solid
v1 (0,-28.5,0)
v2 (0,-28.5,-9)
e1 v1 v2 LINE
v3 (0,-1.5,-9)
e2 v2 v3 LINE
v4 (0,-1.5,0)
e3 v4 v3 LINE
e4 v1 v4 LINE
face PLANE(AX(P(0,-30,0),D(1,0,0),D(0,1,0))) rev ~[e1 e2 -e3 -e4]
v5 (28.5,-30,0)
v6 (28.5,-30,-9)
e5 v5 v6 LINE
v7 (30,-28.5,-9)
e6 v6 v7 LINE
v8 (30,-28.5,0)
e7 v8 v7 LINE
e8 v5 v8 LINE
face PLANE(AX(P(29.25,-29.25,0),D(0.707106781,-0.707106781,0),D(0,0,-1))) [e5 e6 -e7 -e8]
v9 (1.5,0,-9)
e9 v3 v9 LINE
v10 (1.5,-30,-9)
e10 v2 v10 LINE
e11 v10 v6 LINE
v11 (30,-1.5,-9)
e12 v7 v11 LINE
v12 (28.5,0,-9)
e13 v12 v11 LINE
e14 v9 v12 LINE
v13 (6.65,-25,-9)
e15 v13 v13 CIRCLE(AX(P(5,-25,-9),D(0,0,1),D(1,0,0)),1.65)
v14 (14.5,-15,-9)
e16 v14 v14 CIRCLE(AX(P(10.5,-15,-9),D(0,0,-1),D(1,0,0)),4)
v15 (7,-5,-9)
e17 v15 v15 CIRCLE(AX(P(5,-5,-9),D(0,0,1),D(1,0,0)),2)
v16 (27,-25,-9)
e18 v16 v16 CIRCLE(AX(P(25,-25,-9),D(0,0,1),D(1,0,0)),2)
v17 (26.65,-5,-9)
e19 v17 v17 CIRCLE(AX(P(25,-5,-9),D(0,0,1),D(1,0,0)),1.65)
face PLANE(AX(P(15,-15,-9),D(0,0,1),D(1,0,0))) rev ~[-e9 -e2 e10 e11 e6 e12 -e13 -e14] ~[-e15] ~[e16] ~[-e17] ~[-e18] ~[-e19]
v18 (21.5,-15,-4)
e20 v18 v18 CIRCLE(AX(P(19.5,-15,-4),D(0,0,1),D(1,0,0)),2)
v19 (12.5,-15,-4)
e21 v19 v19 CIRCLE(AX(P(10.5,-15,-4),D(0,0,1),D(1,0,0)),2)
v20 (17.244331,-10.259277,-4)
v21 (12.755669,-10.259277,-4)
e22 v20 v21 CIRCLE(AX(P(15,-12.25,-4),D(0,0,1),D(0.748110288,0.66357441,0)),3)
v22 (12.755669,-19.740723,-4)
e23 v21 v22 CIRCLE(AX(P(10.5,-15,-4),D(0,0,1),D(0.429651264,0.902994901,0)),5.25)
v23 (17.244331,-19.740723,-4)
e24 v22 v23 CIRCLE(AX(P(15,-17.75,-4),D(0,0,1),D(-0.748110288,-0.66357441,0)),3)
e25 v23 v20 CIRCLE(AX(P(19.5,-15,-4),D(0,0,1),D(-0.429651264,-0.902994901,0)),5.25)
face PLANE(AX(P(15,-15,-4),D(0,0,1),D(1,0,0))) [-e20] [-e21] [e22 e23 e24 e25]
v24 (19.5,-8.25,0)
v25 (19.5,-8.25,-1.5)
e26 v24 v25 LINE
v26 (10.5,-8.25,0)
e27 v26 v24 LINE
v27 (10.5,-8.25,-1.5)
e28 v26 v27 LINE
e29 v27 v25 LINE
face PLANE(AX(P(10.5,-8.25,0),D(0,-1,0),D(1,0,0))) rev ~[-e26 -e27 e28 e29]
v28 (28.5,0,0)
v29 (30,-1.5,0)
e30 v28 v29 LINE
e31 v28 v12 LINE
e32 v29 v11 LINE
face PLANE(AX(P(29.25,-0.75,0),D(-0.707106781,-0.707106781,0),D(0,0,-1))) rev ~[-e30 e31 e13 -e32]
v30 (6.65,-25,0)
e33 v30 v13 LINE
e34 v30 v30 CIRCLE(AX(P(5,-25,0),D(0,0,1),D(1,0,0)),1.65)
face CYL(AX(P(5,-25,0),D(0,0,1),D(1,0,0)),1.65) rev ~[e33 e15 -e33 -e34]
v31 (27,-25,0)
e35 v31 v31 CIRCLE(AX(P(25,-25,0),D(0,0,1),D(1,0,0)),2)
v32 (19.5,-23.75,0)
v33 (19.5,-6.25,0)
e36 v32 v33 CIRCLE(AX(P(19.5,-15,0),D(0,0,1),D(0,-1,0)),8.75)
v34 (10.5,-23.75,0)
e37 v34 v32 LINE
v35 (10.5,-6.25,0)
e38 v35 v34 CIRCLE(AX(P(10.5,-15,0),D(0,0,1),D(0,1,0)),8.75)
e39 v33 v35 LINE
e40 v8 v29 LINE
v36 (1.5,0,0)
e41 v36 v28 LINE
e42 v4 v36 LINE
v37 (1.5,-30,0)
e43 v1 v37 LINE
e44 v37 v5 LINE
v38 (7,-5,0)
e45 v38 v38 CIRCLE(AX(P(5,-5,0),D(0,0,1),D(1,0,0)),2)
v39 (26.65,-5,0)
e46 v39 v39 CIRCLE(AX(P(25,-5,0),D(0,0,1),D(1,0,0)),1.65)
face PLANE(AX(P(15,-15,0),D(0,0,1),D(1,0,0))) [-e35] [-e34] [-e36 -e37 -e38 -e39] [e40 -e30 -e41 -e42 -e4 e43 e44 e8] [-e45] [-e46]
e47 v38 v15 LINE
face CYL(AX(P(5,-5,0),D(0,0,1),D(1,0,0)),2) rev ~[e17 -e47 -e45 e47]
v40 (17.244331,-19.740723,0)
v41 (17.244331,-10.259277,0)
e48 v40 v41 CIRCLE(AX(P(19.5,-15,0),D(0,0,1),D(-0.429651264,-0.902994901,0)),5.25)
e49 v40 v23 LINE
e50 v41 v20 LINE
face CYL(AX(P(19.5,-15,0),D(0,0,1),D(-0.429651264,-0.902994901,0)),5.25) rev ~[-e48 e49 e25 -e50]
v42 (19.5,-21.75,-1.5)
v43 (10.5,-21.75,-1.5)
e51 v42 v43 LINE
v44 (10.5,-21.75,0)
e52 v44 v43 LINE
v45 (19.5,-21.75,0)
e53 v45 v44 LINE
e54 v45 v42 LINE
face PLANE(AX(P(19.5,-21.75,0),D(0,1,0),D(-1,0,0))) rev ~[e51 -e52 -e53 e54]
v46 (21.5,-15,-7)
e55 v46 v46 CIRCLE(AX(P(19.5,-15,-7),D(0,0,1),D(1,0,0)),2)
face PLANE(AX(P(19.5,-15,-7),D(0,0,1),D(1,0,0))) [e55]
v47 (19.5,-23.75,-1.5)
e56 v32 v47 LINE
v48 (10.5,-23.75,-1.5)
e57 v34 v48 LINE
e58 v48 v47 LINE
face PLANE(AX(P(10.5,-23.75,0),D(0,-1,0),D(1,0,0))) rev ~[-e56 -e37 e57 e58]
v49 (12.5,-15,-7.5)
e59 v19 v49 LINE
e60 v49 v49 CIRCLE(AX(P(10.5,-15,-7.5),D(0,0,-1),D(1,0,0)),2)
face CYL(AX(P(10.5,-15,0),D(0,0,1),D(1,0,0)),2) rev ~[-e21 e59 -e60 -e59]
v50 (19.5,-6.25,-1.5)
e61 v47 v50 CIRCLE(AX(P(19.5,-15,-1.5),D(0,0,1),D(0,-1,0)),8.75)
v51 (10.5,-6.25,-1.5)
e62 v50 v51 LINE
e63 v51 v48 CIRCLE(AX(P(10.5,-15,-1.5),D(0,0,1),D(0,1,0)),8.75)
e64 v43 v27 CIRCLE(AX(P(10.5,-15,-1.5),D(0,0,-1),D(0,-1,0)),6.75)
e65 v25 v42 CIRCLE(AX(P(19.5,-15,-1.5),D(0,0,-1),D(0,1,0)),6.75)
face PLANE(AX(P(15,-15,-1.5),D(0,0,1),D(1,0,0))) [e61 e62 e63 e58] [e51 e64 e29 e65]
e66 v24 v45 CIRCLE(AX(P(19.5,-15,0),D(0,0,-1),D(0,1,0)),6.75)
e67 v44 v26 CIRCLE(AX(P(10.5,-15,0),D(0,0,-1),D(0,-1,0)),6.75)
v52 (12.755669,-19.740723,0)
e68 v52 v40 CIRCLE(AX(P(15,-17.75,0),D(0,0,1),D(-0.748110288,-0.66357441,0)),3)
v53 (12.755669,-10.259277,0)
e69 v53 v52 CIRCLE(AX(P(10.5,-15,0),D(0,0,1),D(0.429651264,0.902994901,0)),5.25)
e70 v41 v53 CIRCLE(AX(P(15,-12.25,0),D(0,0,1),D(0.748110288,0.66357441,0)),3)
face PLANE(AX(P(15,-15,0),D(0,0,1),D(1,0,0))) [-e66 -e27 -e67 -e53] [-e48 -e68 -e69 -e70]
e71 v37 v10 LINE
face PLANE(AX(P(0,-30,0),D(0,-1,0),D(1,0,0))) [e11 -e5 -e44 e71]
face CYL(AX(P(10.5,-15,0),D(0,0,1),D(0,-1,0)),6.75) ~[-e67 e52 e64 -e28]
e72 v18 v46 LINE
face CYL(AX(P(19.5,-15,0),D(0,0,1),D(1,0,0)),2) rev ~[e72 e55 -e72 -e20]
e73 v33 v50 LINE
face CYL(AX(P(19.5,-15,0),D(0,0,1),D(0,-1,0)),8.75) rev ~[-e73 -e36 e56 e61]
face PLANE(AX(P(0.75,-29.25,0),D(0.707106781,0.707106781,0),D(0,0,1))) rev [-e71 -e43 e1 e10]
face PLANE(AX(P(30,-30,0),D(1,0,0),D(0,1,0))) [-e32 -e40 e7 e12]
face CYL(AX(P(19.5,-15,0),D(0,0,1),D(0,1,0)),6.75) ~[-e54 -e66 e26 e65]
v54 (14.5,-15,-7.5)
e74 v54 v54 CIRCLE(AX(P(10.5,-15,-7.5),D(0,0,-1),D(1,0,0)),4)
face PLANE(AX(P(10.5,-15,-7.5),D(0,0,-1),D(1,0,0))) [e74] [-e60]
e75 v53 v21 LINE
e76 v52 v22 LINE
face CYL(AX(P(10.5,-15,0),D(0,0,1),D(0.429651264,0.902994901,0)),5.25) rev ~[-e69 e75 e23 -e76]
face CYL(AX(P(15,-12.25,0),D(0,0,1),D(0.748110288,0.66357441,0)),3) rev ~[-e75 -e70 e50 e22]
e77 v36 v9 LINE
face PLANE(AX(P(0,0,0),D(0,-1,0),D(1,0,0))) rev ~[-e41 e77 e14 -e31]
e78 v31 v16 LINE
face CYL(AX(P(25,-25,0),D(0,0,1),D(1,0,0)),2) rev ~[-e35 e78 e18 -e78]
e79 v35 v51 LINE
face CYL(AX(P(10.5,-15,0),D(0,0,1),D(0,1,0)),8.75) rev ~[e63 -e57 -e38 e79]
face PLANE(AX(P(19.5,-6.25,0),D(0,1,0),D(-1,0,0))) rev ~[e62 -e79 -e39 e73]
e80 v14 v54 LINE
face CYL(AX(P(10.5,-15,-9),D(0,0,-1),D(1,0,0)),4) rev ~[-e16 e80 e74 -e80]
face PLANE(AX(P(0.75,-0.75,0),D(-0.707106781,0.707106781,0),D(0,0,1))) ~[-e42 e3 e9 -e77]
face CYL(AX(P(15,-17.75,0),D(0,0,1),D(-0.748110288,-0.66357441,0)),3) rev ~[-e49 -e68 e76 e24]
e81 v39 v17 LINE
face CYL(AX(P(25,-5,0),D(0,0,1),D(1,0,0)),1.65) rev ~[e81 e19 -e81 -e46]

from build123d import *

# Parameters (mm, degrees)
F0_W     = 30
F0_H     = 30
F0_R     = 1.65
F0_R_2   = 2
F1_DEPTH = 9
F2_DEPTH = 1.5
F3_DEPTH = 7
F4_DEPTH = 4
F5_R     = 4
F5_R_2   = 2
F6_DEPTH = 1.5
F7_DEPTH = 10
F8_SIZE  = 1.5


# Not quite as in the source:
# - a feature names something its author has since deleted; it is built from what else it names


with BuildPart() as f1:
    # F0 (on Top) → F1 (new body)
    with BuildSketch(Plane.XY):
        with Locations((15, -15)):
            Rectangle(F0_W, F0_H)
        with Locations((5, -25)):
            Circle(F0_R, mode=Mode.SUBTRACT)
        with Locations((25, -25)):
            Circle(F0_R_2, mode=Mode.SUBTRACT)
        with Locations((5, -5)):
            Circle(F0_R_2, mode=Mode.SUBTRACT)
        with BuildLine():
            Line((19.5, -23.75), (10.5, -23.75))
            ThreePointArc((10.5, -23.75), (1.75, -15), (10.5, -6.25))
            Line((10.5, -6.25), (19.5, -6.25))
            ThreePointArc((19.5, -6.25), (28.25, -15), (19.5, -23.75))
        make_face(mode=Mode.SUBTRACT)
        with Locations((25, -5)):
            Circle(F0_R, mode=Mode.SUBTRACT)
        with BuildLine():
            ThreePointArc((10.5, -6.25), (1.75, -15), (10.5, -23.75))
            Line((10.5, -23.75), (19.5, -23.75))
            ThreePointArc((19.5, -23.75), (28.25, -15), (19.5, -6.25))
            Line((19.5, -6.25), (10.5, -6.25))
        make_face()
        with BuildLine():
            ThreePointArc((10.5, -21.75), (3.75, -15), (10.5, -8.25))
            Line((10.5, -8.25), (19.5, -8.25))
            ThreePointArc((19.5, -8.25), (26.25, -15), (19.5, -21.75))
            Line((19.5, -21.75), (10.5, -21.75))
        make_face(mode=Mode.SUBTRACT)
        with BuildLine():
            Line((19.5, -8.25), (10.5, -8.25))
            ThreePointArc((10.5, -8.25), (3.75, -15), (10.5, -21.75))
            Line((10.5, -21.75), (19.5, -21.75))
            ThreePointArc((19.5, -21.75), (26.25, -15), (19.5, -8.25))
        make_face()
        with BuildLine():
            ThreePointArc((17.2443308628, -10.25927677), (24.75, -15), (17.2443308628, -19.74072323))
            ThreePointArc((17.2443308628, -19.74072323), (15, -20.75), (12.7556691372, -19.74072323))
            ThreePointArc((12.7556691372, -19.74072323), (5.25, -15), (12.7556691372, -10.25927677))
            ThreePointArc((12.7556691372, -10.25927677), (15, -9.25), (17.2443308628, -10.25927677))
        make_face(mode=Mode.SUBTRACT)
        with BuildLine():
            ThreePointArc((12.7556691372, -19.74072323), (15, -20.75), (17.2443308628, -19.74072323))
            ThreePointArc((17.2443308628, -19.74072323), (24.75, -15), (17.2443308628, -10.25927677))
            ThreePointArc((17.2443308628, -10.25927677), (15, -9.25), (12.7556691372, -10.25927677))
            ThreePointArc((12.7556691372, -10.25927677), (5.25, -15), (12.7556691372, -19.74072323))
        make_face()
        with Locations((10.5, -15)):
            Circle(F0_R_2, mode=Mode.SUBTRACT)
        with Locations((19.5, -15)):
            Circle(F0_R_2, mode=Mode.SUBTRACT)
        with Locations((19.5, -15)):
            Circle(F0_R_2)
        with Locations((25, -25)):
            Circle(F0_R_2)
        with Locations((25, -5)):
            Circle(F0_R)
    extrude(amount=-F1_DEPTH)

    # F0 (on Top) → F2 (cut)
    with BuildSketch(Plane.XY):
        with BuildLine():
            ThreePointArc((10.5, -6.25), (1.75, -15), (10.5, -23.75))
            Line((10.5, -23.75), (19.5, -23.75))
            ThreePointArc((19.5, -23.75), (28.25, -15), (19.5, -6.25))
            Line((19.5, -6.25), (10.5, -6.25))
        make_face()
        with BuildLine():
            ThreePointArc((10.5, -21.75), (3.75, -15), (10.5, -8.25))
            Line((10.5, -8.25), (19.5, -8.25))
            ThreePointArc((19.5, -8.25), (26.25, -15), (19.5, -21.75))
            Line((19.5, -21.75), (10.5, -21.75))
        make_face(mode=Mode.SUBTRACT)
    extrude(amount=-F2_DEPTH, mode=Mode.SUBTRACT)

    # F0 (on Top) → F3 (cut)
    with BuildSketch(Plane.XY):
        with Locations((19.5, -15)):
            Circle(F0_R_2)
    extrude(amount=-F3_DEPTH, mode=Mode.SUBTRACT)

    # F0 (on Top) → F4 (cut)
    with BuildSketch(Plane.XY):
        with BuildLine():
            ThreePointArc((12.7556691372, -19.74072323), (15, -20.75), (17.2443308628, -19.74072323))
            ThreePointArc((17.2443308628, -19.74072323), (24.75, -15), (17.2443308628, -10.25927677))
            ThreePointArc((17.2443308628, -10.25927677), (15, -9.25), (12.7556691372, -10.25927677))
            ThreePointArc((12.7556691372, -10.25927677), (5.25, -15), (12.7556691372, -19.74072323))
        make_face()
        with Locations((10.5, -15)):
            Circle(F0_R_2, mode=Mode.SUBTRACT)
        with Locations((19.5, -15)):
            Circle(F0_R_2, mode=Mode.SUBTRACT)
    extrude(amount=-F4_DEPTH, mode=Mode.SUBTRACT)

    # F5 (on face) → F6 (cut)
    with BuildSketch(Plane(origin=(0, 0, -9), x_dir=(1, 0, 0), z_dir=(0, 0, -1))):
        with Locations((10.5, 15)):
            Circle(F5_R)
        with Locations((10.5, 15)):
            Circle(F5_R_2, mode=Mode.SUBTRACT)
    extrude(amount=-F6_DEPTH, mode=Mode.SUBTRACT)

    # F0 (on Top) → F7 (cut)
    with BuildSketch(Plane.XY):
        with Locations((25, -25)):
            Circle(F0_R_2)
        with Locations((25, -5)):
            Circle(F0_R)
    extrude(amount=-F7_DEPTH, mode=Mode.SUBTRACT)

    # F8
    f8_edges = [f1.edges().sort_by_distance(p)[0] for p in [
        (30, -30, -4.5),
        (30, 0, -4.5),
        (0, -30, -4.5),
        (0, 0, -4.5),
    ]]
    chamfer(f8_edges, length=F8_SIZE)


solid = f1.part
